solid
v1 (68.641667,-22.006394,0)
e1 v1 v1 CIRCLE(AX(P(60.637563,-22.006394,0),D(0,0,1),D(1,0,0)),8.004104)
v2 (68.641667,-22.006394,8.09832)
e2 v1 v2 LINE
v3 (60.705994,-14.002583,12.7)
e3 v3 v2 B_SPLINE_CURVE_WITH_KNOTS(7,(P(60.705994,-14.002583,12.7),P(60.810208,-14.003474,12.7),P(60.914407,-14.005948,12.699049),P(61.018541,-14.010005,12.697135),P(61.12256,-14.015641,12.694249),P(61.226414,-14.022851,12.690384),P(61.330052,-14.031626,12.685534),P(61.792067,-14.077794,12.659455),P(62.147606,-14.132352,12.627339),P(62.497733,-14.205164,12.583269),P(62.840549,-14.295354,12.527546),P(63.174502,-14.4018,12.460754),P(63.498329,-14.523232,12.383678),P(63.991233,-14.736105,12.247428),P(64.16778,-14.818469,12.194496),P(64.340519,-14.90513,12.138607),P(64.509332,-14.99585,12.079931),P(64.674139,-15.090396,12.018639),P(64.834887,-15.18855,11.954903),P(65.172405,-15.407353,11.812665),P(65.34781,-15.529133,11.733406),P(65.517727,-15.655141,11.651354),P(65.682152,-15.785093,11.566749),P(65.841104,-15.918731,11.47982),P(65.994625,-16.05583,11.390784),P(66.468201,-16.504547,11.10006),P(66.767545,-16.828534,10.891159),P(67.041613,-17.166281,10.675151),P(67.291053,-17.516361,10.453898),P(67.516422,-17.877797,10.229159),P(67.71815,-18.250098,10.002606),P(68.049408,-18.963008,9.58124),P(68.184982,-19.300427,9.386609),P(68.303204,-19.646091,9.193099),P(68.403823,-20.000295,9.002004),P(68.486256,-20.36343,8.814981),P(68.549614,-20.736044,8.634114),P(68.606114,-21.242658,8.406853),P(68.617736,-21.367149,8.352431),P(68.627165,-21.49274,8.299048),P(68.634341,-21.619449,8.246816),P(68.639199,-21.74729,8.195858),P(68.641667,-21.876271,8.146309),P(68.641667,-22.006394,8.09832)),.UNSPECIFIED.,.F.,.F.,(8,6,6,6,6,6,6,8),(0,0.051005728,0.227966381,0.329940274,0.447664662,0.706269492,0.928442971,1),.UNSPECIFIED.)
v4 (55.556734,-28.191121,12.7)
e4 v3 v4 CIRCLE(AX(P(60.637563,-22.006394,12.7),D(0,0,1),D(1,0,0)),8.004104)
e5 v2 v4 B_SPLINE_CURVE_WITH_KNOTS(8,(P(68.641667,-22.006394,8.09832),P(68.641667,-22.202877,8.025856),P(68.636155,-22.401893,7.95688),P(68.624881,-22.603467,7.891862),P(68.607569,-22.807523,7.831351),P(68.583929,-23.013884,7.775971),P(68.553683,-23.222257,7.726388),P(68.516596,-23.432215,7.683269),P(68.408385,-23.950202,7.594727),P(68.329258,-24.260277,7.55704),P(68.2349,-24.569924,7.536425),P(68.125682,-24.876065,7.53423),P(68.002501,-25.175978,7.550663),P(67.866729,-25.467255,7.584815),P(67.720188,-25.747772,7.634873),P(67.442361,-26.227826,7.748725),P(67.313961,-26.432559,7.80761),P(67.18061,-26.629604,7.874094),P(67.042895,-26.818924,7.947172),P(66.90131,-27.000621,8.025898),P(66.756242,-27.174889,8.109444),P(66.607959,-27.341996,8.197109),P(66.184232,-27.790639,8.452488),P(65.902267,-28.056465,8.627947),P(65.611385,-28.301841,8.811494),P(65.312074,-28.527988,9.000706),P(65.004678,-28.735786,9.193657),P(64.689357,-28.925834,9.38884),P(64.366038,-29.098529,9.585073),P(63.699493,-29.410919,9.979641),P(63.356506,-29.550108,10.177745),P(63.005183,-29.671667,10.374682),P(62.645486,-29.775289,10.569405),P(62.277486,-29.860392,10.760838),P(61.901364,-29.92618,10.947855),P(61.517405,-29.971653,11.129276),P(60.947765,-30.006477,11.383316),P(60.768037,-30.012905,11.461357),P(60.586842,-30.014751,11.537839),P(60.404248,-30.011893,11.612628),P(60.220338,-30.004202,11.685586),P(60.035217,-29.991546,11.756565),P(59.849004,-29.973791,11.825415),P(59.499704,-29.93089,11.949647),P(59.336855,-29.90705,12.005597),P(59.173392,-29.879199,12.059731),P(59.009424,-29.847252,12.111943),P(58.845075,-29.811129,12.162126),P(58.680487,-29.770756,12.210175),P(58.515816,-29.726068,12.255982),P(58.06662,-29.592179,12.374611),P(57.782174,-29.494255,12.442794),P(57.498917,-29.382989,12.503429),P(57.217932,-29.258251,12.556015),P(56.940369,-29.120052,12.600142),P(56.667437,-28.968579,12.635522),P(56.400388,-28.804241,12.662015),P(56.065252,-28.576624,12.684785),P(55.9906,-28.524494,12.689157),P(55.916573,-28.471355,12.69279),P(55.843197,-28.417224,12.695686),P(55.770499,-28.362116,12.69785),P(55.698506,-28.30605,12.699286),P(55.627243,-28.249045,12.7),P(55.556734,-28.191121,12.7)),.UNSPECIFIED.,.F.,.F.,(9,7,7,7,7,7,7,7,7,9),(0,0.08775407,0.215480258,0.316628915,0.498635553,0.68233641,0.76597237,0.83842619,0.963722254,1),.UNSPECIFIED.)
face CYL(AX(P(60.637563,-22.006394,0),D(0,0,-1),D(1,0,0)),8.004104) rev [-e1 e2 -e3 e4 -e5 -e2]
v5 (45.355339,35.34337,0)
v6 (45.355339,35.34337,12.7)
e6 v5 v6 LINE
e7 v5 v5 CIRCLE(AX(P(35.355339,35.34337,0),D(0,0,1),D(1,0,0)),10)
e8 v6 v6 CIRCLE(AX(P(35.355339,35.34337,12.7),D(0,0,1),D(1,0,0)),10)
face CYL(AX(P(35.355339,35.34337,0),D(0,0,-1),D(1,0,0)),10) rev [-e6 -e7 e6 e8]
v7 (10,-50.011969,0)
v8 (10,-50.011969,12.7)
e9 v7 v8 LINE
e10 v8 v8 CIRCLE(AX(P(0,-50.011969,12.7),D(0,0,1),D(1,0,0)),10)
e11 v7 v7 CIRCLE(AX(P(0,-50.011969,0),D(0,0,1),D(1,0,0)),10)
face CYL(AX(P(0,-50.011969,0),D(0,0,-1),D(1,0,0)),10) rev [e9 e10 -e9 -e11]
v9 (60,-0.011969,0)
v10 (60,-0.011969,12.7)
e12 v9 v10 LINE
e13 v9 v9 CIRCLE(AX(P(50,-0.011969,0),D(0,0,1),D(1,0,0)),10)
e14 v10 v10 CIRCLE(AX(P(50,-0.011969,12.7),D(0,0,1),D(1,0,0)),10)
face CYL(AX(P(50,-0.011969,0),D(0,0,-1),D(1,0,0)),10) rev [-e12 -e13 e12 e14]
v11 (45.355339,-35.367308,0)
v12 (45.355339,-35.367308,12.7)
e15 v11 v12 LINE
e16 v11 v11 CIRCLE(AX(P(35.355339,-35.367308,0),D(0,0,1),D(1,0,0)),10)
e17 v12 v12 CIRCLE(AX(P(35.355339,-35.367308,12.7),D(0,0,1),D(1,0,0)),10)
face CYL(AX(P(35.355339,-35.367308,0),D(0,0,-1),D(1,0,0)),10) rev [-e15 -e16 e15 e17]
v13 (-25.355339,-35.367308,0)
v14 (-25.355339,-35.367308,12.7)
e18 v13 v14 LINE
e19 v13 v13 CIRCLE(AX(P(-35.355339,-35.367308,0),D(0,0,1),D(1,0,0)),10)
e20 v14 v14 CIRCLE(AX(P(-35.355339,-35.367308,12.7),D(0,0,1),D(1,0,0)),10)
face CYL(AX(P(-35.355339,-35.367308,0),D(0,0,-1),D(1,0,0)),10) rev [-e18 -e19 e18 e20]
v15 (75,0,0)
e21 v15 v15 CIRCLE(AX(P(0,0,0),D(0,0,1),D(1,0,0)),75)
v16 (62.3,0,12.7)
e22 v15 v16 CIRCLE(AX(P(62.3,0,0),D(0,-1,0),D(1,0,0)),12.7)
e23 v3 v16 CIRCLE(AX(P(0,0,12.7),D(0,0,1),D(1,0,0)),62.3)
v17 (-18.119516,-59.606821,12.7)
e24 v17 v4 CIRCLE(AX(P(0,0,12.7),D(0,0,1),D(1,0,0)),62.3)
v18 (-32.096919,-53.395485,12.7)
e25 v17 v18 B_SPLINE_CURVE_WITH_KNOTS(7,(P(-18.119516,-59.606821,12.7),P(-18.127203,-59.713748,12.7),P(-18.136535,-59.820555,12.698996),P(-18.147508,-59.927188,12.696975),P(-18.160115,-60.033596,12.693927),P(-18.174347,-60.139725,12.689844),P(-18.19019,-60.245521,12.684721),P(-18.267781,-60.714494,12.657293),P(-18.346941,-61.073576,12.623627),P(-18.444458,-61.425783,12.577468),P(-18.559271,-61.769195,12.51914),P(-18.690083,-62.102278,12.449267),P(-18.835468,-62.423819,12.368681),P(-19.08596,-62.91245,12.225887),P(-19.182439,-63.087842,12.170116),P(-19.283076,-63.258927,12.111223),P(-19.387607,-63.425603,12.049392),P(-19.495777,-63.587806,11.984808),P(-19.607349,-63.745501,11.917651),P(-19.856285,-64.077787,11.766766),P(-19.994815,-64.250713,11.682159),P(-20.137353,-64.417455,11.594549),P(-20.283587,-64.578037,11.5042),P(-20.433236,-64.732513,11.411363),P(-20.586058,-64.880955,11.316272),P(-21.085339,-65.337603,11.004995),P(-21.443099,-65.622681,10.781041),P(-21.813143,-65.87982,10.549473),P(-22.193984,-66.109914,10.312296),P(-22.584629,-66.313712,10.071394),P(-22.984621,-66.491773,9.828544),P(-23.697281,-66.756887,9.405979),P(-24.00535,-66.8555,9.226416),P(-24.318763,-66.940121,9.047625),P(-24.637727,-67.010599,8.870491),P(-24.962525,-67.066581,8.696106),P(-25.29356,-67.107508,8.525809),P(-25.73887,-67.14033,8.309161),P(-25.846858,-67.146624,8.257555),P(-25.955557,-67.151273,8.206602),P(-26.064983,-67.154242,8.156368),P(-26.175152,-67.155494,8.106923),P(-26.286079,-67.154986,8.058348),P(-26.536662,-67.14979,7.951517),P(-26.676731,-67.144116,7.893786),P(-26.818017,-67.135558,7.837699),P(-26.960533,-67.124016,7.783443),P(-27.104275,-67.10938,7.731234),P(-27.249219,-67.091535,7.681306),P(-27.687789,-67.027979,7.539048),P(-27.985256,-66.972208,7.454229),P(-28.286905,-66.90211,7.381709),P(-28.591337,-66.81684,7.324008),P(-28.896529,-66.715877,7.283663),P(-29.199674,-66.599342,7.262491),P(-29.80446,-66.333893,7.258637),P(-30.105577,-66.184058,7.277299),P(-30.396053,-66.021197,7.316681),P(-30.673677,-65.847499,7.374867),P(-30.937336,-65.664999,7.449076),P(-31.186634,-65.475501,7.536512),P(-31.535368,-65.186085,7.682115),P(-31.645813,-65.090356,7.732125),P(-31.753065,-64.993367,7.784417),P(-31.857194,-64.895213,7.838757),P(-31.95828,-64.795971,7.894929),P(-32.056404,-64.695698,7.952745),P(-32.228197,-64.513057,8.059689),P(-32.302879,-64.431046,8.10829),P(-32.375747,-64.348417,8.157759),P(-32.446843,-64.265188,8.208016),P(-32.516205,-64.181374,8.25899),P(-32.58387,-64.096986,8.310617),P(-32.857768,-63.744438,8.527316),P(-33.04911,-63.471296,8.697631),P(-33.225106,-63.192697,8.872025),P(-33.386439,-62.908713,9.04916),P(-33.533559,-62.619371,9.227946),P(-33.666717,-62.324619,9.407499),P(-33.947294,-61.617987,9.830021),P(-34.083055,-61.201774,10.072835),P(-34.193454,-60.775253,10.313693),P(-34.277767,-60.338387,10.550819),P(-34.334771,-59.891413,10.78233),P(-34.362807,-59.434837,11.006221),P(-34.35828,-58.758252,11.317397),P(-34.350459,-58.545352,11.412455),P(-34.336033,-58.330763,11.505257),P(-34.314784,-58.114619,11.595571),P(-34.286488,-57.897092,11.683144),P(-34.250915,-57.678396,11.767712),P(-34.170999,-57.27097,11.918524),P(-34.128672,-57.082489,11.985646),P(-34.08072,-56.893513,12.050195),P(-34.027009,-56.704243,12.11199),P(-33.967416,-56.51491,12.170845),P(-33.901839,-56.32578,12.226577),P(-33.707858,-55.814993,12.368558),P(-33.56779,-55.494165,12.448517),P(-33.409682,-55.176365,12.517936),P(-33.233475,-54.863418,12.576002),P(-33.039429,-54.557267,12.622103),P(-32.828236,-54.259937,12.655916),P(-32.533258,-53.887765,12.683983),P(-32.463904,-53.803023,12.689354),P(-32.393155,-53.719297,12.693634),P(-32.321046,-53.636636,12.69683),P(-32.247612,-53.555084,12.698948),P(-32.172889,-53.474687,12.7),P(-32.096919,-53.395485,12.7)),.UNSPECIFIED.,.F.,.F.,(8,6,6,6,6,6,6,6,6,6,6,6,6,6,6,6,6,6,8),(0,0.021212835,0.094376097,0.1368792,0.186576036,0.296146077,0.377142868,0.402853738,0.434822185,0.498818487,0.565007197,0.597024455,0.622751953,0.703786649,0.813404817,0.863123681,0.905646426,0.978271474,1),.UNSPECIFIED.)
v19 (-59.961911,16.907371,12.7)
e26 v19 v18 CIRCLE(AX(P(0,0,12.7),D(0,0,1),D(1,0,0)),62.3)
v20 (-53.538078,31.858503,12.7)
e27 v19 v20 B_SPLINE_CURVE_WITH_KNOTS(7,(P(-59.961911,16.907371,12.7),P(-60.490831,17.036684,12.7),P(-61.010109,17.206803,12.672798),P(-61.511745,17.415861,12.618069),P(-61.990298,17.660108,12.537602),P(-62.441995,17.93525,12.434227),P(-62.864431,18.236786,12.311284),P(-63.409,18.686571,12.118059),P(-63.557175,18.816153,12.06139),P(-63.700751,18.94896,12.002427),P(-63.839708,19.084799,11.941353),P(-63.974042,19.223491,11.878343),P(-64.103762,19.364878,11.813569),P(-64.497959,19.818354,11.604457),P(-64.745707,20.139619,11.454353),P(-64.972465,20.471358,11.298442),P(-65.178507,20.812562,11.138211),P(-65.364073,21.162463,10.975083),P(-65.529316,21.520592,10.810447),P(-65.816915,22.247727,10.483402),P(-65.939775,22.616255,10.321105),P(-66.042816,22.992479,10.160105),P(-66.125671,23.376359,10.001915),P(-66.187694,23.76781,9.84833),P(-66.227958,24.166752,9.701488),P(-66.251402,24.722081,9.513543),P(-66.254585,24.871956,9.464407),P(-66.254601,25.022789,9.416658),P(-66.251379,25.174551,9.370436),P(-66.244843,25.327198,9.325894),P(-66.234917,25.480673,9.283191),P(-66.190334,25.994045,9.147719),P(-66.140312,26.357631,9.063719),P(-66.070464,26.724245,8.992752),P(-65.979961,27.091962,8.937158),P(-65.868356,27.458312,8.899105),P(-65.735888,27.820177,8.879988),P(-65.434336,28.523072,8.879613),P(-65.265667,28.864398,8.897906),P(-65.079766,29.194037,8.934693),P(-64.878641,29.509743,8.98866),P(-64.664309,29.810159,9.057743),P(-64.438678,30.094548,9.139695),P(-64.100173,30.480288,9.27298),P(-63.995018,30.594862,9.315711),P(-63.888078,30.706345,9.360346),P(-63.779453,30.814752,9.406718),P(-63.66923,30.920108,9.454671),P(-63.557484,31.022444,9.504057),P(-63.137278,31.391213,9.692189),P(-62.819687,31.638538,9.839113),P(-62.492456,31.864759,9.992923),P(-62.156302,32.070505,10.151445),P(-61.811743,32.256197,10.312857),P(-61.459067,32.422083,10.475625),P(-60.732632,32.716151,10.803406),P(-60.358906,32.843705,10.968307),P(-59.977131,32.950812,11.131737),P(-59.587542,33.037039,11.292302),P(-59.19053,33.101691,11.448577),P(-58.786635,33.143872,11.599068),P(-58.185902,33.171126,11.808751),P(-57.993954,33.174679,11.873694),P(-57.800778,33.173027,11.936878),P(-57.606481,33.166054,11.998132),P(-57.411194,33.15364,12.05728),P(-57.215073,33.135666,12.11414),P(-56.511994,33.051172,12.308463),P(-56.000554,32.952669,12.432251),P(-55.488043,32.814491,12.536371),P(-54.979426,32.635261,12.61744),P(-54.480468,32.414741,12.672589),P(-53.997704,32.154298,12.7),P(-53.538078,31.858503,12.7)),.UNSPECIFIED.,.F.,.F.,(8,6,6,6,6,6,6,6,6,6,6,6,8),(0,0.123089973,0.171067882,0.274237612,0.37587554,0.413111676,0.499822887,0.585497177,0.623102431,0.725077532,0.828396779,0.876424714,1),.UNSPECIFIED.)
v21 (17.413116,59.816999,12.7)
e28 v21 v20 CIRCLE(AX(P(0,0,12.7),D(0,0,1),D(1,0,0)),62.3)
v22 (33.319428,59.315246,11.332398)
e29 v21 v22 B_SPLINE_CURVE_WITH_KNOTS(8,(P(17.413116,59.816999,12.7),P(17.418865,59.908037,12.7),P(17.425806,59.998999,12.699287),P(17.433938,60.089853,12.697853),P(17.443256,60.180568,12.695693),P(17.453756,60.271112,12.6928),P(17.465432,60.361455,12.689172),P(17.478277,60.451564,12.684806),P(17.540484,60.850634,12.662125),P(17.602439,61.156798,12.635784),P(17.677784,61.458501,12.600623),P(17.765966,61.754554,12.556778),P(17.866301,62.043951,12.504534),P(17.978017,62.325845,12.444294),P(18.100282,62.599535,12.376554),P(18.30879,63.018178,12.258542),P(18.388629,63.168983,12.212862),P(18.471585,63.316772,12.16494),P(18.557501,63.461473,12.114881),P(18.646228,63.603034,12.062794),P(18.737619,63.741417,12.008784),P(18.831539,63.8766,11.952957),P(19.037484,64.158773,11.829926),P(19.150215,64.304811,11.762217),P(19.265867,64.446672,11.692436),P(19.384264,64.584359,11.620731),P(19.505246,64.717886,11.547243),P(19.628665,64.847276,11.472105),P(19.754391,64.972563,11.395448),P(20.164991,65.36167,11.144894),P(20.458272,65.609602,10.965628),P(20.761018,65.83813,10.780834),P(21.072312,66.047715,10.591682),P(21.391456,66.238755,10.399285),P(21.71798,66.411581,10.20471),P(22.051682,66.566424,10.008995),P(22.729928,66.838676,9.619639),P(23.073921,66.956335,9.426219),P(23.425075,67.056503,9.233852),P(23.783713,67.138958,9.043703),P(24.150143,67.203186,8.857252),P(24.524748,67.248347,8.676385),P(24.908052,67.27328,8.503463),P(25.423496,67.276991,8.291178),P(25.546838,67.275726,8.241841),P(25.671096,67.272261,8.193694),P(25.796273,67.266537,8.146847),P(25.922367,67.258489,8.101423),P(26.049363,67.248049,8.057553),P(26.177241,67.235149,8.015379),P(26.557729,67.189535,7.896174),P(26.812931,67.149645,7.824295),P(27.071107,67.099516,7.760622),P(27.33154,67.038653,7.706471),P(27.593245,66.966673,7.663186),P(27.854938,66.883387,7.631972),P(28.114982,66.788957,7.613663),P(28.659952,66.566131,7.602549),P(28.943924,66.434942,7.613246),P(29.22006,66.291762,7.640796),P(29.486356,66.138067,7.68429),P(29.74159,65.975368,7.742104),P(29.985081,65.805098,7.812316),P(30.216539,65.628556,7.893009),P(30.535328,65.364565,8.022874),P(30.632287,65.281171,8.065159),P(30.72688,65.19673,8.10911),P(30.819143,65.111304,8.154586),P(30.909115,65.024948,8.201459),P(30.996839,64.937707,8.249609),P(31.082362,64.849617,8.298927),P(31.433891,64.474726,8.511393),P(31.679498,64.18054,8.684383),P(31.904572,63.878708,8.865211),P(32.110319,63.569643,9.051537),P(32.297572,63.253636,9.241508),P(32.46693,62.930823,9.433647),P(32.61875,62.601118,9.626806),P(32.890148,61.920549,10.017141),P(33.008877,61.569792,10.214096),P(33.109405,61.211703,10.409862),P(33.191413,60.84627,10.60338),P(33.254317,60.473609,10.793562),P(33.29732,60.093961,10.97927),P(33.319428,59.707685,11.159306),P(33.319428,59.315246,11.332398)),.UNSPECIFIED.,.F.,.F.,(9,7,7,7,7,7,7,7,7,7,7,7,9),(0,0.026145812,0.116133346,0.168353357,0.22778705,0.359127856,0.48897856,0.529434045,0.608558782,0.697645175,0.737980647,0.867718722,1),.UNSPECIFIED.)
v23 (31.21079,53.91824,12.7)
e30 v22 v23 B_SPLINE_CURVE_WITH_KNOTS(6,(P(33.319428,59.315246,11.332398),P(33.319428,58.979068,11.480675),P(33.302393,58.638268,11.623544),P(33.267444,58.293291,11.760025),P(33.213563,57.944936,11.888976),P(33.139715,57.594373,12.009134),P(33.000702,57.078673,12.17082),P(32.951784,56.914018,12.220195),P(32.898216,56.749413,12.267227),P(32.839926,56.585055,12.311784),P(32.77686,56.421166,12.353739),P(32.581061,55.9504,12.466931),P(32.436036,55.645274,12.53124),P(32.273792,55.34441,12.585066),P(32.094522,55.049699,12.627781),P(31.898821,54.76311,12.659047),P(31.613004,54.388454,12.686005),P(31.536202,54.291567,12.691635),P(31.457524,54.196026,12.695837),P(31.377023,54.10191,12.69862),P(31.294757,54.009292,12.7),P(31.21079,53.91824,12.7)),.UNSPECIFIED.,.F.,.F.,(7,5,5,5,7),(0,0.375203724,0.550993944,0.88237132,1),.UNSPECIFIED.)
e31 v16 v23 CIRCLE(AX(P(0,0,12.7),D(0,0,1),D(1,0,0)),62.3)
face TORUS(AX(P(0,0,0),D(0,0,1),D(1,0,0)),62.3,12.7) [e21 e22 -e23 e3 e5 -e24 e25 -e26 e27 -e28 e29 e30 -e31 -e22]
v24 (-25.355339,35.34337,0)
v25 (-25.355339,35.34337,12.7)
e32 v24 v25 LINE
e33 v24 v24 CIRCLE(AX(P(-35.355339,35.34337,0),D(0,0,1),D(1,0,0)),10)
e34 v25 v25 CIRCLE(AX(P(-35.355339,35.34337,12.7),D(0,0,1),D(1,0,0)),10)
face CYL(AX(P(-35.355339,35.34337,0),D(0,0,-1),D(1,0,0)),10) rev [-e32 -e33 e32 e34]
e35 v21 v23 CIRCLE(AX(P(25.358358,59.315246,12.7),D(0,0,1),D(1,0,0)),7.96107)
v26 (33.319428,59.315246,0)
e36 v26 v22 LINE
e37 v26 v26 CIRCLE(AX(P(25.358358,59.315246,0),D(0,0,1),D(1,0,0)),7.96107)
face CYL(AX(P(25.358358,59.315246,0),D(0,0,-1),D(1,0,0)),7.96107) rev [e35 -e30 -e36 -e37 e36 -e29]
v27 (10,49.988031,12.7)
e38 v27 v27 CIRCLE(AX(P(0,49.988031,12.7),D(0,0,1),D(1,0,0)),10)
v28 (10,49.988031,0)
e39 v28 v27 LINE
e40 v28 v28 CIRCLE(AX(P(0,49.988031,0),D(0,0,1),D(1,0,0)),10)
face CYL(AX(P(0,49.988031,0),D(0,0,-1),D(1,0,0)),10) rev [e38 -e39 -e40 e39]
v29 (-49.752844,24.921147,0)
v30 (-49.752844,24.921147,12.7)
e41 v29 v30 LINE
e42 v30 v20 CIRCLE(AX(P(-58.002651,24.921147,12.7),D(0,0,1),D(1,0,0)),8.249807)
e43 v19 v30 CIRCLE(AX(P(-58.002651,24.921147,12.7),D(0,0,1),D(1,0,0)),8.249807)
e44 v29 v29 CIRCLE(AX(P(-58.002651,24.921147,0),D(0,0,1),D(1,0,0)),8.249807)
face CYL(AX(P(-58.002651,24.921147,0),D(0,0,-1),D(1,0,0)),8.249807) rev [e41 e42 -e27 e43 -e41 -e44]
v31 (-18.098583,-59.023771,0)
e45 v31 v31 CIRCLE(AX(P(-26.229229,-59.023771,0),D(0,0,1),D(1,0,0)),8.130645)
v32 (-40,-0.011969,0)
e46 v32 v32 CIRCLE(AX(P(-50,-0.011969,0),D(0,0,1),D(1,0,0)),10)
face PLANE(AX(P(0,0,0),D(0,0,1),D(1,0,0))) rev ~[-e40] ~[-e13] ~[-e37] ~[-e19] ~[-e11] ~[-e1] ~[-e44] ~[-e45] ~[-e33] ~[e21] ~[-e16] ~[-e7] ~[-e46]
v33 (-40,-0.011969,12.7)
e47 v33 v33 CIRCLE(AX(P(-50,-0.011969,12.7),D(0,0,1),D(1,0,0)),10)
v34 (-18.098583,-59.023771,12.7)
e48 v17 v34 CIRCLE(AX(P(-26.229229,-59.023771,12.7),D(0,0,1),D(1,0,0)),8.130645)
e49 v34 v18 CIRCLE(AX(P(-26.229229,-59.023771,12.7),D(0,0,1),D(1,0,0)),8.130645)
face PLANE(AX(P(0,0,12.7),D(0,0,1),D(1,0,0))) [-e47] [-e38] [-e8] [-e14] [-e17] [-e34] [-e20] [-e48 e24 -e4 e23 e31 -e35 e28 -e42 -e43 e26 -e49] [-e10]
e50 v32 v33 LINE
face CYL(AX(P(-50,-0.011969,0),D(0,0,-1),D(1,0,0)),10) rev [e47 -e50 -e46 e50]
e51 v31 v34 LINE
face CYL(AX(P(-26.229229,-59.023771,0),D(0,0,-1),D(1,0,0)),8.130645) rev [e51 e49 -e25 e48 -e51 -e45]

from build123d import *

# Parameters (mm, degrees)
F0_R     = 75
F0_R_2   = 8.1306454005
F0_R_3   = 10
F0_R_4   = 8.004103626
F0_R_5   = 8.2498069198
F0_R_6   = 7.9610699334
F1_DEPTH = 12.7


# Not quite as in the source:
# - a fillet or chamfer that OpenCascade refuses, or shapes differently, is made with other operations: its cross-section is extruded or revolved along the edge and cut away or added
# - the program builds the solid bodies; features that only make, move or delete a surface that nothing else refers to are left out


with BuildPart() as f1:
    # F0 (on Top) → F1 (new body)
    with BuildSketch(Plane.XY):
        Circle(F0_R)
        with Locations((-26.2292288244, -59.023771435)):
            Circle(F0_R_2, mode=Mode.SUBTRACT)
        with Locations((-50, -0.0119686127)):
            Circle(F0_R_3, mode=Mode.SUBTRACT)
        with Locations((-35.3553390593, -35.367307672)):
            Circle(F0_R_3, mode=Mode.SUBTRACT)
        with Locations((0, -50.0119686127)):
            Circle(F0_R_3, mode=Mode.SUBTRACT)
        with Locations((35.3553390593, -35.367307672)):
            Circle(F0_R_3, mode=Mode.SUBTRACT)
        with Locations((60.637563467, -22.0063943416)):
            Circle(F0_R_4, mode=Mode.SUBTRACT)
        with Locations((50, -0.0119686127)):
            Circle(F0_R_3, mode=Mode.SUBTRACT)
        with Locations((-58.0026507378, 24.9211471528)):
            Circle(F0_R_5, mode=Mode.SUBTRACT)
        with Locations((-35.3553390593, 35.3433704467)):
            Circle(F0_R_3, mode=Mode.SUBTRACT)
        with Locations((35.3553390593, 35.3433704467)):
            Circle(F0_R_3, mode=Mode.SUBTRACT)
        with Locations((0, 49.9880313873)):
            Circle(F0_R_3, mode=Mode.SUBTRACT)
        with Locations((25.3583583981, 59.3152455986)):
            Circle(F0_R_6, mode=Mode.SUBTRACT)
    extrude(amount=F1_DEPTH)

    # F2: fillet of radius 12.7 on 1 edges, made by hand

    # F2_s1 → F2_t2 (revolve, cut)
    with BuildSketch(Plane.XZ):
        with BuildLine():
            ThreePointArc((75, 0), (71.2802561211, 8.9802561211), (62.3, 12.7))
            Line((62.3, 12.7), (75, 12.7))
            Line((75, 12.7), (75, 0))
        make_face()
    revolve(axis=Axis((0, 0, 12.7), (0, 0, 1)), mode=Mode.SUBTRACT)


solid = f1.part
